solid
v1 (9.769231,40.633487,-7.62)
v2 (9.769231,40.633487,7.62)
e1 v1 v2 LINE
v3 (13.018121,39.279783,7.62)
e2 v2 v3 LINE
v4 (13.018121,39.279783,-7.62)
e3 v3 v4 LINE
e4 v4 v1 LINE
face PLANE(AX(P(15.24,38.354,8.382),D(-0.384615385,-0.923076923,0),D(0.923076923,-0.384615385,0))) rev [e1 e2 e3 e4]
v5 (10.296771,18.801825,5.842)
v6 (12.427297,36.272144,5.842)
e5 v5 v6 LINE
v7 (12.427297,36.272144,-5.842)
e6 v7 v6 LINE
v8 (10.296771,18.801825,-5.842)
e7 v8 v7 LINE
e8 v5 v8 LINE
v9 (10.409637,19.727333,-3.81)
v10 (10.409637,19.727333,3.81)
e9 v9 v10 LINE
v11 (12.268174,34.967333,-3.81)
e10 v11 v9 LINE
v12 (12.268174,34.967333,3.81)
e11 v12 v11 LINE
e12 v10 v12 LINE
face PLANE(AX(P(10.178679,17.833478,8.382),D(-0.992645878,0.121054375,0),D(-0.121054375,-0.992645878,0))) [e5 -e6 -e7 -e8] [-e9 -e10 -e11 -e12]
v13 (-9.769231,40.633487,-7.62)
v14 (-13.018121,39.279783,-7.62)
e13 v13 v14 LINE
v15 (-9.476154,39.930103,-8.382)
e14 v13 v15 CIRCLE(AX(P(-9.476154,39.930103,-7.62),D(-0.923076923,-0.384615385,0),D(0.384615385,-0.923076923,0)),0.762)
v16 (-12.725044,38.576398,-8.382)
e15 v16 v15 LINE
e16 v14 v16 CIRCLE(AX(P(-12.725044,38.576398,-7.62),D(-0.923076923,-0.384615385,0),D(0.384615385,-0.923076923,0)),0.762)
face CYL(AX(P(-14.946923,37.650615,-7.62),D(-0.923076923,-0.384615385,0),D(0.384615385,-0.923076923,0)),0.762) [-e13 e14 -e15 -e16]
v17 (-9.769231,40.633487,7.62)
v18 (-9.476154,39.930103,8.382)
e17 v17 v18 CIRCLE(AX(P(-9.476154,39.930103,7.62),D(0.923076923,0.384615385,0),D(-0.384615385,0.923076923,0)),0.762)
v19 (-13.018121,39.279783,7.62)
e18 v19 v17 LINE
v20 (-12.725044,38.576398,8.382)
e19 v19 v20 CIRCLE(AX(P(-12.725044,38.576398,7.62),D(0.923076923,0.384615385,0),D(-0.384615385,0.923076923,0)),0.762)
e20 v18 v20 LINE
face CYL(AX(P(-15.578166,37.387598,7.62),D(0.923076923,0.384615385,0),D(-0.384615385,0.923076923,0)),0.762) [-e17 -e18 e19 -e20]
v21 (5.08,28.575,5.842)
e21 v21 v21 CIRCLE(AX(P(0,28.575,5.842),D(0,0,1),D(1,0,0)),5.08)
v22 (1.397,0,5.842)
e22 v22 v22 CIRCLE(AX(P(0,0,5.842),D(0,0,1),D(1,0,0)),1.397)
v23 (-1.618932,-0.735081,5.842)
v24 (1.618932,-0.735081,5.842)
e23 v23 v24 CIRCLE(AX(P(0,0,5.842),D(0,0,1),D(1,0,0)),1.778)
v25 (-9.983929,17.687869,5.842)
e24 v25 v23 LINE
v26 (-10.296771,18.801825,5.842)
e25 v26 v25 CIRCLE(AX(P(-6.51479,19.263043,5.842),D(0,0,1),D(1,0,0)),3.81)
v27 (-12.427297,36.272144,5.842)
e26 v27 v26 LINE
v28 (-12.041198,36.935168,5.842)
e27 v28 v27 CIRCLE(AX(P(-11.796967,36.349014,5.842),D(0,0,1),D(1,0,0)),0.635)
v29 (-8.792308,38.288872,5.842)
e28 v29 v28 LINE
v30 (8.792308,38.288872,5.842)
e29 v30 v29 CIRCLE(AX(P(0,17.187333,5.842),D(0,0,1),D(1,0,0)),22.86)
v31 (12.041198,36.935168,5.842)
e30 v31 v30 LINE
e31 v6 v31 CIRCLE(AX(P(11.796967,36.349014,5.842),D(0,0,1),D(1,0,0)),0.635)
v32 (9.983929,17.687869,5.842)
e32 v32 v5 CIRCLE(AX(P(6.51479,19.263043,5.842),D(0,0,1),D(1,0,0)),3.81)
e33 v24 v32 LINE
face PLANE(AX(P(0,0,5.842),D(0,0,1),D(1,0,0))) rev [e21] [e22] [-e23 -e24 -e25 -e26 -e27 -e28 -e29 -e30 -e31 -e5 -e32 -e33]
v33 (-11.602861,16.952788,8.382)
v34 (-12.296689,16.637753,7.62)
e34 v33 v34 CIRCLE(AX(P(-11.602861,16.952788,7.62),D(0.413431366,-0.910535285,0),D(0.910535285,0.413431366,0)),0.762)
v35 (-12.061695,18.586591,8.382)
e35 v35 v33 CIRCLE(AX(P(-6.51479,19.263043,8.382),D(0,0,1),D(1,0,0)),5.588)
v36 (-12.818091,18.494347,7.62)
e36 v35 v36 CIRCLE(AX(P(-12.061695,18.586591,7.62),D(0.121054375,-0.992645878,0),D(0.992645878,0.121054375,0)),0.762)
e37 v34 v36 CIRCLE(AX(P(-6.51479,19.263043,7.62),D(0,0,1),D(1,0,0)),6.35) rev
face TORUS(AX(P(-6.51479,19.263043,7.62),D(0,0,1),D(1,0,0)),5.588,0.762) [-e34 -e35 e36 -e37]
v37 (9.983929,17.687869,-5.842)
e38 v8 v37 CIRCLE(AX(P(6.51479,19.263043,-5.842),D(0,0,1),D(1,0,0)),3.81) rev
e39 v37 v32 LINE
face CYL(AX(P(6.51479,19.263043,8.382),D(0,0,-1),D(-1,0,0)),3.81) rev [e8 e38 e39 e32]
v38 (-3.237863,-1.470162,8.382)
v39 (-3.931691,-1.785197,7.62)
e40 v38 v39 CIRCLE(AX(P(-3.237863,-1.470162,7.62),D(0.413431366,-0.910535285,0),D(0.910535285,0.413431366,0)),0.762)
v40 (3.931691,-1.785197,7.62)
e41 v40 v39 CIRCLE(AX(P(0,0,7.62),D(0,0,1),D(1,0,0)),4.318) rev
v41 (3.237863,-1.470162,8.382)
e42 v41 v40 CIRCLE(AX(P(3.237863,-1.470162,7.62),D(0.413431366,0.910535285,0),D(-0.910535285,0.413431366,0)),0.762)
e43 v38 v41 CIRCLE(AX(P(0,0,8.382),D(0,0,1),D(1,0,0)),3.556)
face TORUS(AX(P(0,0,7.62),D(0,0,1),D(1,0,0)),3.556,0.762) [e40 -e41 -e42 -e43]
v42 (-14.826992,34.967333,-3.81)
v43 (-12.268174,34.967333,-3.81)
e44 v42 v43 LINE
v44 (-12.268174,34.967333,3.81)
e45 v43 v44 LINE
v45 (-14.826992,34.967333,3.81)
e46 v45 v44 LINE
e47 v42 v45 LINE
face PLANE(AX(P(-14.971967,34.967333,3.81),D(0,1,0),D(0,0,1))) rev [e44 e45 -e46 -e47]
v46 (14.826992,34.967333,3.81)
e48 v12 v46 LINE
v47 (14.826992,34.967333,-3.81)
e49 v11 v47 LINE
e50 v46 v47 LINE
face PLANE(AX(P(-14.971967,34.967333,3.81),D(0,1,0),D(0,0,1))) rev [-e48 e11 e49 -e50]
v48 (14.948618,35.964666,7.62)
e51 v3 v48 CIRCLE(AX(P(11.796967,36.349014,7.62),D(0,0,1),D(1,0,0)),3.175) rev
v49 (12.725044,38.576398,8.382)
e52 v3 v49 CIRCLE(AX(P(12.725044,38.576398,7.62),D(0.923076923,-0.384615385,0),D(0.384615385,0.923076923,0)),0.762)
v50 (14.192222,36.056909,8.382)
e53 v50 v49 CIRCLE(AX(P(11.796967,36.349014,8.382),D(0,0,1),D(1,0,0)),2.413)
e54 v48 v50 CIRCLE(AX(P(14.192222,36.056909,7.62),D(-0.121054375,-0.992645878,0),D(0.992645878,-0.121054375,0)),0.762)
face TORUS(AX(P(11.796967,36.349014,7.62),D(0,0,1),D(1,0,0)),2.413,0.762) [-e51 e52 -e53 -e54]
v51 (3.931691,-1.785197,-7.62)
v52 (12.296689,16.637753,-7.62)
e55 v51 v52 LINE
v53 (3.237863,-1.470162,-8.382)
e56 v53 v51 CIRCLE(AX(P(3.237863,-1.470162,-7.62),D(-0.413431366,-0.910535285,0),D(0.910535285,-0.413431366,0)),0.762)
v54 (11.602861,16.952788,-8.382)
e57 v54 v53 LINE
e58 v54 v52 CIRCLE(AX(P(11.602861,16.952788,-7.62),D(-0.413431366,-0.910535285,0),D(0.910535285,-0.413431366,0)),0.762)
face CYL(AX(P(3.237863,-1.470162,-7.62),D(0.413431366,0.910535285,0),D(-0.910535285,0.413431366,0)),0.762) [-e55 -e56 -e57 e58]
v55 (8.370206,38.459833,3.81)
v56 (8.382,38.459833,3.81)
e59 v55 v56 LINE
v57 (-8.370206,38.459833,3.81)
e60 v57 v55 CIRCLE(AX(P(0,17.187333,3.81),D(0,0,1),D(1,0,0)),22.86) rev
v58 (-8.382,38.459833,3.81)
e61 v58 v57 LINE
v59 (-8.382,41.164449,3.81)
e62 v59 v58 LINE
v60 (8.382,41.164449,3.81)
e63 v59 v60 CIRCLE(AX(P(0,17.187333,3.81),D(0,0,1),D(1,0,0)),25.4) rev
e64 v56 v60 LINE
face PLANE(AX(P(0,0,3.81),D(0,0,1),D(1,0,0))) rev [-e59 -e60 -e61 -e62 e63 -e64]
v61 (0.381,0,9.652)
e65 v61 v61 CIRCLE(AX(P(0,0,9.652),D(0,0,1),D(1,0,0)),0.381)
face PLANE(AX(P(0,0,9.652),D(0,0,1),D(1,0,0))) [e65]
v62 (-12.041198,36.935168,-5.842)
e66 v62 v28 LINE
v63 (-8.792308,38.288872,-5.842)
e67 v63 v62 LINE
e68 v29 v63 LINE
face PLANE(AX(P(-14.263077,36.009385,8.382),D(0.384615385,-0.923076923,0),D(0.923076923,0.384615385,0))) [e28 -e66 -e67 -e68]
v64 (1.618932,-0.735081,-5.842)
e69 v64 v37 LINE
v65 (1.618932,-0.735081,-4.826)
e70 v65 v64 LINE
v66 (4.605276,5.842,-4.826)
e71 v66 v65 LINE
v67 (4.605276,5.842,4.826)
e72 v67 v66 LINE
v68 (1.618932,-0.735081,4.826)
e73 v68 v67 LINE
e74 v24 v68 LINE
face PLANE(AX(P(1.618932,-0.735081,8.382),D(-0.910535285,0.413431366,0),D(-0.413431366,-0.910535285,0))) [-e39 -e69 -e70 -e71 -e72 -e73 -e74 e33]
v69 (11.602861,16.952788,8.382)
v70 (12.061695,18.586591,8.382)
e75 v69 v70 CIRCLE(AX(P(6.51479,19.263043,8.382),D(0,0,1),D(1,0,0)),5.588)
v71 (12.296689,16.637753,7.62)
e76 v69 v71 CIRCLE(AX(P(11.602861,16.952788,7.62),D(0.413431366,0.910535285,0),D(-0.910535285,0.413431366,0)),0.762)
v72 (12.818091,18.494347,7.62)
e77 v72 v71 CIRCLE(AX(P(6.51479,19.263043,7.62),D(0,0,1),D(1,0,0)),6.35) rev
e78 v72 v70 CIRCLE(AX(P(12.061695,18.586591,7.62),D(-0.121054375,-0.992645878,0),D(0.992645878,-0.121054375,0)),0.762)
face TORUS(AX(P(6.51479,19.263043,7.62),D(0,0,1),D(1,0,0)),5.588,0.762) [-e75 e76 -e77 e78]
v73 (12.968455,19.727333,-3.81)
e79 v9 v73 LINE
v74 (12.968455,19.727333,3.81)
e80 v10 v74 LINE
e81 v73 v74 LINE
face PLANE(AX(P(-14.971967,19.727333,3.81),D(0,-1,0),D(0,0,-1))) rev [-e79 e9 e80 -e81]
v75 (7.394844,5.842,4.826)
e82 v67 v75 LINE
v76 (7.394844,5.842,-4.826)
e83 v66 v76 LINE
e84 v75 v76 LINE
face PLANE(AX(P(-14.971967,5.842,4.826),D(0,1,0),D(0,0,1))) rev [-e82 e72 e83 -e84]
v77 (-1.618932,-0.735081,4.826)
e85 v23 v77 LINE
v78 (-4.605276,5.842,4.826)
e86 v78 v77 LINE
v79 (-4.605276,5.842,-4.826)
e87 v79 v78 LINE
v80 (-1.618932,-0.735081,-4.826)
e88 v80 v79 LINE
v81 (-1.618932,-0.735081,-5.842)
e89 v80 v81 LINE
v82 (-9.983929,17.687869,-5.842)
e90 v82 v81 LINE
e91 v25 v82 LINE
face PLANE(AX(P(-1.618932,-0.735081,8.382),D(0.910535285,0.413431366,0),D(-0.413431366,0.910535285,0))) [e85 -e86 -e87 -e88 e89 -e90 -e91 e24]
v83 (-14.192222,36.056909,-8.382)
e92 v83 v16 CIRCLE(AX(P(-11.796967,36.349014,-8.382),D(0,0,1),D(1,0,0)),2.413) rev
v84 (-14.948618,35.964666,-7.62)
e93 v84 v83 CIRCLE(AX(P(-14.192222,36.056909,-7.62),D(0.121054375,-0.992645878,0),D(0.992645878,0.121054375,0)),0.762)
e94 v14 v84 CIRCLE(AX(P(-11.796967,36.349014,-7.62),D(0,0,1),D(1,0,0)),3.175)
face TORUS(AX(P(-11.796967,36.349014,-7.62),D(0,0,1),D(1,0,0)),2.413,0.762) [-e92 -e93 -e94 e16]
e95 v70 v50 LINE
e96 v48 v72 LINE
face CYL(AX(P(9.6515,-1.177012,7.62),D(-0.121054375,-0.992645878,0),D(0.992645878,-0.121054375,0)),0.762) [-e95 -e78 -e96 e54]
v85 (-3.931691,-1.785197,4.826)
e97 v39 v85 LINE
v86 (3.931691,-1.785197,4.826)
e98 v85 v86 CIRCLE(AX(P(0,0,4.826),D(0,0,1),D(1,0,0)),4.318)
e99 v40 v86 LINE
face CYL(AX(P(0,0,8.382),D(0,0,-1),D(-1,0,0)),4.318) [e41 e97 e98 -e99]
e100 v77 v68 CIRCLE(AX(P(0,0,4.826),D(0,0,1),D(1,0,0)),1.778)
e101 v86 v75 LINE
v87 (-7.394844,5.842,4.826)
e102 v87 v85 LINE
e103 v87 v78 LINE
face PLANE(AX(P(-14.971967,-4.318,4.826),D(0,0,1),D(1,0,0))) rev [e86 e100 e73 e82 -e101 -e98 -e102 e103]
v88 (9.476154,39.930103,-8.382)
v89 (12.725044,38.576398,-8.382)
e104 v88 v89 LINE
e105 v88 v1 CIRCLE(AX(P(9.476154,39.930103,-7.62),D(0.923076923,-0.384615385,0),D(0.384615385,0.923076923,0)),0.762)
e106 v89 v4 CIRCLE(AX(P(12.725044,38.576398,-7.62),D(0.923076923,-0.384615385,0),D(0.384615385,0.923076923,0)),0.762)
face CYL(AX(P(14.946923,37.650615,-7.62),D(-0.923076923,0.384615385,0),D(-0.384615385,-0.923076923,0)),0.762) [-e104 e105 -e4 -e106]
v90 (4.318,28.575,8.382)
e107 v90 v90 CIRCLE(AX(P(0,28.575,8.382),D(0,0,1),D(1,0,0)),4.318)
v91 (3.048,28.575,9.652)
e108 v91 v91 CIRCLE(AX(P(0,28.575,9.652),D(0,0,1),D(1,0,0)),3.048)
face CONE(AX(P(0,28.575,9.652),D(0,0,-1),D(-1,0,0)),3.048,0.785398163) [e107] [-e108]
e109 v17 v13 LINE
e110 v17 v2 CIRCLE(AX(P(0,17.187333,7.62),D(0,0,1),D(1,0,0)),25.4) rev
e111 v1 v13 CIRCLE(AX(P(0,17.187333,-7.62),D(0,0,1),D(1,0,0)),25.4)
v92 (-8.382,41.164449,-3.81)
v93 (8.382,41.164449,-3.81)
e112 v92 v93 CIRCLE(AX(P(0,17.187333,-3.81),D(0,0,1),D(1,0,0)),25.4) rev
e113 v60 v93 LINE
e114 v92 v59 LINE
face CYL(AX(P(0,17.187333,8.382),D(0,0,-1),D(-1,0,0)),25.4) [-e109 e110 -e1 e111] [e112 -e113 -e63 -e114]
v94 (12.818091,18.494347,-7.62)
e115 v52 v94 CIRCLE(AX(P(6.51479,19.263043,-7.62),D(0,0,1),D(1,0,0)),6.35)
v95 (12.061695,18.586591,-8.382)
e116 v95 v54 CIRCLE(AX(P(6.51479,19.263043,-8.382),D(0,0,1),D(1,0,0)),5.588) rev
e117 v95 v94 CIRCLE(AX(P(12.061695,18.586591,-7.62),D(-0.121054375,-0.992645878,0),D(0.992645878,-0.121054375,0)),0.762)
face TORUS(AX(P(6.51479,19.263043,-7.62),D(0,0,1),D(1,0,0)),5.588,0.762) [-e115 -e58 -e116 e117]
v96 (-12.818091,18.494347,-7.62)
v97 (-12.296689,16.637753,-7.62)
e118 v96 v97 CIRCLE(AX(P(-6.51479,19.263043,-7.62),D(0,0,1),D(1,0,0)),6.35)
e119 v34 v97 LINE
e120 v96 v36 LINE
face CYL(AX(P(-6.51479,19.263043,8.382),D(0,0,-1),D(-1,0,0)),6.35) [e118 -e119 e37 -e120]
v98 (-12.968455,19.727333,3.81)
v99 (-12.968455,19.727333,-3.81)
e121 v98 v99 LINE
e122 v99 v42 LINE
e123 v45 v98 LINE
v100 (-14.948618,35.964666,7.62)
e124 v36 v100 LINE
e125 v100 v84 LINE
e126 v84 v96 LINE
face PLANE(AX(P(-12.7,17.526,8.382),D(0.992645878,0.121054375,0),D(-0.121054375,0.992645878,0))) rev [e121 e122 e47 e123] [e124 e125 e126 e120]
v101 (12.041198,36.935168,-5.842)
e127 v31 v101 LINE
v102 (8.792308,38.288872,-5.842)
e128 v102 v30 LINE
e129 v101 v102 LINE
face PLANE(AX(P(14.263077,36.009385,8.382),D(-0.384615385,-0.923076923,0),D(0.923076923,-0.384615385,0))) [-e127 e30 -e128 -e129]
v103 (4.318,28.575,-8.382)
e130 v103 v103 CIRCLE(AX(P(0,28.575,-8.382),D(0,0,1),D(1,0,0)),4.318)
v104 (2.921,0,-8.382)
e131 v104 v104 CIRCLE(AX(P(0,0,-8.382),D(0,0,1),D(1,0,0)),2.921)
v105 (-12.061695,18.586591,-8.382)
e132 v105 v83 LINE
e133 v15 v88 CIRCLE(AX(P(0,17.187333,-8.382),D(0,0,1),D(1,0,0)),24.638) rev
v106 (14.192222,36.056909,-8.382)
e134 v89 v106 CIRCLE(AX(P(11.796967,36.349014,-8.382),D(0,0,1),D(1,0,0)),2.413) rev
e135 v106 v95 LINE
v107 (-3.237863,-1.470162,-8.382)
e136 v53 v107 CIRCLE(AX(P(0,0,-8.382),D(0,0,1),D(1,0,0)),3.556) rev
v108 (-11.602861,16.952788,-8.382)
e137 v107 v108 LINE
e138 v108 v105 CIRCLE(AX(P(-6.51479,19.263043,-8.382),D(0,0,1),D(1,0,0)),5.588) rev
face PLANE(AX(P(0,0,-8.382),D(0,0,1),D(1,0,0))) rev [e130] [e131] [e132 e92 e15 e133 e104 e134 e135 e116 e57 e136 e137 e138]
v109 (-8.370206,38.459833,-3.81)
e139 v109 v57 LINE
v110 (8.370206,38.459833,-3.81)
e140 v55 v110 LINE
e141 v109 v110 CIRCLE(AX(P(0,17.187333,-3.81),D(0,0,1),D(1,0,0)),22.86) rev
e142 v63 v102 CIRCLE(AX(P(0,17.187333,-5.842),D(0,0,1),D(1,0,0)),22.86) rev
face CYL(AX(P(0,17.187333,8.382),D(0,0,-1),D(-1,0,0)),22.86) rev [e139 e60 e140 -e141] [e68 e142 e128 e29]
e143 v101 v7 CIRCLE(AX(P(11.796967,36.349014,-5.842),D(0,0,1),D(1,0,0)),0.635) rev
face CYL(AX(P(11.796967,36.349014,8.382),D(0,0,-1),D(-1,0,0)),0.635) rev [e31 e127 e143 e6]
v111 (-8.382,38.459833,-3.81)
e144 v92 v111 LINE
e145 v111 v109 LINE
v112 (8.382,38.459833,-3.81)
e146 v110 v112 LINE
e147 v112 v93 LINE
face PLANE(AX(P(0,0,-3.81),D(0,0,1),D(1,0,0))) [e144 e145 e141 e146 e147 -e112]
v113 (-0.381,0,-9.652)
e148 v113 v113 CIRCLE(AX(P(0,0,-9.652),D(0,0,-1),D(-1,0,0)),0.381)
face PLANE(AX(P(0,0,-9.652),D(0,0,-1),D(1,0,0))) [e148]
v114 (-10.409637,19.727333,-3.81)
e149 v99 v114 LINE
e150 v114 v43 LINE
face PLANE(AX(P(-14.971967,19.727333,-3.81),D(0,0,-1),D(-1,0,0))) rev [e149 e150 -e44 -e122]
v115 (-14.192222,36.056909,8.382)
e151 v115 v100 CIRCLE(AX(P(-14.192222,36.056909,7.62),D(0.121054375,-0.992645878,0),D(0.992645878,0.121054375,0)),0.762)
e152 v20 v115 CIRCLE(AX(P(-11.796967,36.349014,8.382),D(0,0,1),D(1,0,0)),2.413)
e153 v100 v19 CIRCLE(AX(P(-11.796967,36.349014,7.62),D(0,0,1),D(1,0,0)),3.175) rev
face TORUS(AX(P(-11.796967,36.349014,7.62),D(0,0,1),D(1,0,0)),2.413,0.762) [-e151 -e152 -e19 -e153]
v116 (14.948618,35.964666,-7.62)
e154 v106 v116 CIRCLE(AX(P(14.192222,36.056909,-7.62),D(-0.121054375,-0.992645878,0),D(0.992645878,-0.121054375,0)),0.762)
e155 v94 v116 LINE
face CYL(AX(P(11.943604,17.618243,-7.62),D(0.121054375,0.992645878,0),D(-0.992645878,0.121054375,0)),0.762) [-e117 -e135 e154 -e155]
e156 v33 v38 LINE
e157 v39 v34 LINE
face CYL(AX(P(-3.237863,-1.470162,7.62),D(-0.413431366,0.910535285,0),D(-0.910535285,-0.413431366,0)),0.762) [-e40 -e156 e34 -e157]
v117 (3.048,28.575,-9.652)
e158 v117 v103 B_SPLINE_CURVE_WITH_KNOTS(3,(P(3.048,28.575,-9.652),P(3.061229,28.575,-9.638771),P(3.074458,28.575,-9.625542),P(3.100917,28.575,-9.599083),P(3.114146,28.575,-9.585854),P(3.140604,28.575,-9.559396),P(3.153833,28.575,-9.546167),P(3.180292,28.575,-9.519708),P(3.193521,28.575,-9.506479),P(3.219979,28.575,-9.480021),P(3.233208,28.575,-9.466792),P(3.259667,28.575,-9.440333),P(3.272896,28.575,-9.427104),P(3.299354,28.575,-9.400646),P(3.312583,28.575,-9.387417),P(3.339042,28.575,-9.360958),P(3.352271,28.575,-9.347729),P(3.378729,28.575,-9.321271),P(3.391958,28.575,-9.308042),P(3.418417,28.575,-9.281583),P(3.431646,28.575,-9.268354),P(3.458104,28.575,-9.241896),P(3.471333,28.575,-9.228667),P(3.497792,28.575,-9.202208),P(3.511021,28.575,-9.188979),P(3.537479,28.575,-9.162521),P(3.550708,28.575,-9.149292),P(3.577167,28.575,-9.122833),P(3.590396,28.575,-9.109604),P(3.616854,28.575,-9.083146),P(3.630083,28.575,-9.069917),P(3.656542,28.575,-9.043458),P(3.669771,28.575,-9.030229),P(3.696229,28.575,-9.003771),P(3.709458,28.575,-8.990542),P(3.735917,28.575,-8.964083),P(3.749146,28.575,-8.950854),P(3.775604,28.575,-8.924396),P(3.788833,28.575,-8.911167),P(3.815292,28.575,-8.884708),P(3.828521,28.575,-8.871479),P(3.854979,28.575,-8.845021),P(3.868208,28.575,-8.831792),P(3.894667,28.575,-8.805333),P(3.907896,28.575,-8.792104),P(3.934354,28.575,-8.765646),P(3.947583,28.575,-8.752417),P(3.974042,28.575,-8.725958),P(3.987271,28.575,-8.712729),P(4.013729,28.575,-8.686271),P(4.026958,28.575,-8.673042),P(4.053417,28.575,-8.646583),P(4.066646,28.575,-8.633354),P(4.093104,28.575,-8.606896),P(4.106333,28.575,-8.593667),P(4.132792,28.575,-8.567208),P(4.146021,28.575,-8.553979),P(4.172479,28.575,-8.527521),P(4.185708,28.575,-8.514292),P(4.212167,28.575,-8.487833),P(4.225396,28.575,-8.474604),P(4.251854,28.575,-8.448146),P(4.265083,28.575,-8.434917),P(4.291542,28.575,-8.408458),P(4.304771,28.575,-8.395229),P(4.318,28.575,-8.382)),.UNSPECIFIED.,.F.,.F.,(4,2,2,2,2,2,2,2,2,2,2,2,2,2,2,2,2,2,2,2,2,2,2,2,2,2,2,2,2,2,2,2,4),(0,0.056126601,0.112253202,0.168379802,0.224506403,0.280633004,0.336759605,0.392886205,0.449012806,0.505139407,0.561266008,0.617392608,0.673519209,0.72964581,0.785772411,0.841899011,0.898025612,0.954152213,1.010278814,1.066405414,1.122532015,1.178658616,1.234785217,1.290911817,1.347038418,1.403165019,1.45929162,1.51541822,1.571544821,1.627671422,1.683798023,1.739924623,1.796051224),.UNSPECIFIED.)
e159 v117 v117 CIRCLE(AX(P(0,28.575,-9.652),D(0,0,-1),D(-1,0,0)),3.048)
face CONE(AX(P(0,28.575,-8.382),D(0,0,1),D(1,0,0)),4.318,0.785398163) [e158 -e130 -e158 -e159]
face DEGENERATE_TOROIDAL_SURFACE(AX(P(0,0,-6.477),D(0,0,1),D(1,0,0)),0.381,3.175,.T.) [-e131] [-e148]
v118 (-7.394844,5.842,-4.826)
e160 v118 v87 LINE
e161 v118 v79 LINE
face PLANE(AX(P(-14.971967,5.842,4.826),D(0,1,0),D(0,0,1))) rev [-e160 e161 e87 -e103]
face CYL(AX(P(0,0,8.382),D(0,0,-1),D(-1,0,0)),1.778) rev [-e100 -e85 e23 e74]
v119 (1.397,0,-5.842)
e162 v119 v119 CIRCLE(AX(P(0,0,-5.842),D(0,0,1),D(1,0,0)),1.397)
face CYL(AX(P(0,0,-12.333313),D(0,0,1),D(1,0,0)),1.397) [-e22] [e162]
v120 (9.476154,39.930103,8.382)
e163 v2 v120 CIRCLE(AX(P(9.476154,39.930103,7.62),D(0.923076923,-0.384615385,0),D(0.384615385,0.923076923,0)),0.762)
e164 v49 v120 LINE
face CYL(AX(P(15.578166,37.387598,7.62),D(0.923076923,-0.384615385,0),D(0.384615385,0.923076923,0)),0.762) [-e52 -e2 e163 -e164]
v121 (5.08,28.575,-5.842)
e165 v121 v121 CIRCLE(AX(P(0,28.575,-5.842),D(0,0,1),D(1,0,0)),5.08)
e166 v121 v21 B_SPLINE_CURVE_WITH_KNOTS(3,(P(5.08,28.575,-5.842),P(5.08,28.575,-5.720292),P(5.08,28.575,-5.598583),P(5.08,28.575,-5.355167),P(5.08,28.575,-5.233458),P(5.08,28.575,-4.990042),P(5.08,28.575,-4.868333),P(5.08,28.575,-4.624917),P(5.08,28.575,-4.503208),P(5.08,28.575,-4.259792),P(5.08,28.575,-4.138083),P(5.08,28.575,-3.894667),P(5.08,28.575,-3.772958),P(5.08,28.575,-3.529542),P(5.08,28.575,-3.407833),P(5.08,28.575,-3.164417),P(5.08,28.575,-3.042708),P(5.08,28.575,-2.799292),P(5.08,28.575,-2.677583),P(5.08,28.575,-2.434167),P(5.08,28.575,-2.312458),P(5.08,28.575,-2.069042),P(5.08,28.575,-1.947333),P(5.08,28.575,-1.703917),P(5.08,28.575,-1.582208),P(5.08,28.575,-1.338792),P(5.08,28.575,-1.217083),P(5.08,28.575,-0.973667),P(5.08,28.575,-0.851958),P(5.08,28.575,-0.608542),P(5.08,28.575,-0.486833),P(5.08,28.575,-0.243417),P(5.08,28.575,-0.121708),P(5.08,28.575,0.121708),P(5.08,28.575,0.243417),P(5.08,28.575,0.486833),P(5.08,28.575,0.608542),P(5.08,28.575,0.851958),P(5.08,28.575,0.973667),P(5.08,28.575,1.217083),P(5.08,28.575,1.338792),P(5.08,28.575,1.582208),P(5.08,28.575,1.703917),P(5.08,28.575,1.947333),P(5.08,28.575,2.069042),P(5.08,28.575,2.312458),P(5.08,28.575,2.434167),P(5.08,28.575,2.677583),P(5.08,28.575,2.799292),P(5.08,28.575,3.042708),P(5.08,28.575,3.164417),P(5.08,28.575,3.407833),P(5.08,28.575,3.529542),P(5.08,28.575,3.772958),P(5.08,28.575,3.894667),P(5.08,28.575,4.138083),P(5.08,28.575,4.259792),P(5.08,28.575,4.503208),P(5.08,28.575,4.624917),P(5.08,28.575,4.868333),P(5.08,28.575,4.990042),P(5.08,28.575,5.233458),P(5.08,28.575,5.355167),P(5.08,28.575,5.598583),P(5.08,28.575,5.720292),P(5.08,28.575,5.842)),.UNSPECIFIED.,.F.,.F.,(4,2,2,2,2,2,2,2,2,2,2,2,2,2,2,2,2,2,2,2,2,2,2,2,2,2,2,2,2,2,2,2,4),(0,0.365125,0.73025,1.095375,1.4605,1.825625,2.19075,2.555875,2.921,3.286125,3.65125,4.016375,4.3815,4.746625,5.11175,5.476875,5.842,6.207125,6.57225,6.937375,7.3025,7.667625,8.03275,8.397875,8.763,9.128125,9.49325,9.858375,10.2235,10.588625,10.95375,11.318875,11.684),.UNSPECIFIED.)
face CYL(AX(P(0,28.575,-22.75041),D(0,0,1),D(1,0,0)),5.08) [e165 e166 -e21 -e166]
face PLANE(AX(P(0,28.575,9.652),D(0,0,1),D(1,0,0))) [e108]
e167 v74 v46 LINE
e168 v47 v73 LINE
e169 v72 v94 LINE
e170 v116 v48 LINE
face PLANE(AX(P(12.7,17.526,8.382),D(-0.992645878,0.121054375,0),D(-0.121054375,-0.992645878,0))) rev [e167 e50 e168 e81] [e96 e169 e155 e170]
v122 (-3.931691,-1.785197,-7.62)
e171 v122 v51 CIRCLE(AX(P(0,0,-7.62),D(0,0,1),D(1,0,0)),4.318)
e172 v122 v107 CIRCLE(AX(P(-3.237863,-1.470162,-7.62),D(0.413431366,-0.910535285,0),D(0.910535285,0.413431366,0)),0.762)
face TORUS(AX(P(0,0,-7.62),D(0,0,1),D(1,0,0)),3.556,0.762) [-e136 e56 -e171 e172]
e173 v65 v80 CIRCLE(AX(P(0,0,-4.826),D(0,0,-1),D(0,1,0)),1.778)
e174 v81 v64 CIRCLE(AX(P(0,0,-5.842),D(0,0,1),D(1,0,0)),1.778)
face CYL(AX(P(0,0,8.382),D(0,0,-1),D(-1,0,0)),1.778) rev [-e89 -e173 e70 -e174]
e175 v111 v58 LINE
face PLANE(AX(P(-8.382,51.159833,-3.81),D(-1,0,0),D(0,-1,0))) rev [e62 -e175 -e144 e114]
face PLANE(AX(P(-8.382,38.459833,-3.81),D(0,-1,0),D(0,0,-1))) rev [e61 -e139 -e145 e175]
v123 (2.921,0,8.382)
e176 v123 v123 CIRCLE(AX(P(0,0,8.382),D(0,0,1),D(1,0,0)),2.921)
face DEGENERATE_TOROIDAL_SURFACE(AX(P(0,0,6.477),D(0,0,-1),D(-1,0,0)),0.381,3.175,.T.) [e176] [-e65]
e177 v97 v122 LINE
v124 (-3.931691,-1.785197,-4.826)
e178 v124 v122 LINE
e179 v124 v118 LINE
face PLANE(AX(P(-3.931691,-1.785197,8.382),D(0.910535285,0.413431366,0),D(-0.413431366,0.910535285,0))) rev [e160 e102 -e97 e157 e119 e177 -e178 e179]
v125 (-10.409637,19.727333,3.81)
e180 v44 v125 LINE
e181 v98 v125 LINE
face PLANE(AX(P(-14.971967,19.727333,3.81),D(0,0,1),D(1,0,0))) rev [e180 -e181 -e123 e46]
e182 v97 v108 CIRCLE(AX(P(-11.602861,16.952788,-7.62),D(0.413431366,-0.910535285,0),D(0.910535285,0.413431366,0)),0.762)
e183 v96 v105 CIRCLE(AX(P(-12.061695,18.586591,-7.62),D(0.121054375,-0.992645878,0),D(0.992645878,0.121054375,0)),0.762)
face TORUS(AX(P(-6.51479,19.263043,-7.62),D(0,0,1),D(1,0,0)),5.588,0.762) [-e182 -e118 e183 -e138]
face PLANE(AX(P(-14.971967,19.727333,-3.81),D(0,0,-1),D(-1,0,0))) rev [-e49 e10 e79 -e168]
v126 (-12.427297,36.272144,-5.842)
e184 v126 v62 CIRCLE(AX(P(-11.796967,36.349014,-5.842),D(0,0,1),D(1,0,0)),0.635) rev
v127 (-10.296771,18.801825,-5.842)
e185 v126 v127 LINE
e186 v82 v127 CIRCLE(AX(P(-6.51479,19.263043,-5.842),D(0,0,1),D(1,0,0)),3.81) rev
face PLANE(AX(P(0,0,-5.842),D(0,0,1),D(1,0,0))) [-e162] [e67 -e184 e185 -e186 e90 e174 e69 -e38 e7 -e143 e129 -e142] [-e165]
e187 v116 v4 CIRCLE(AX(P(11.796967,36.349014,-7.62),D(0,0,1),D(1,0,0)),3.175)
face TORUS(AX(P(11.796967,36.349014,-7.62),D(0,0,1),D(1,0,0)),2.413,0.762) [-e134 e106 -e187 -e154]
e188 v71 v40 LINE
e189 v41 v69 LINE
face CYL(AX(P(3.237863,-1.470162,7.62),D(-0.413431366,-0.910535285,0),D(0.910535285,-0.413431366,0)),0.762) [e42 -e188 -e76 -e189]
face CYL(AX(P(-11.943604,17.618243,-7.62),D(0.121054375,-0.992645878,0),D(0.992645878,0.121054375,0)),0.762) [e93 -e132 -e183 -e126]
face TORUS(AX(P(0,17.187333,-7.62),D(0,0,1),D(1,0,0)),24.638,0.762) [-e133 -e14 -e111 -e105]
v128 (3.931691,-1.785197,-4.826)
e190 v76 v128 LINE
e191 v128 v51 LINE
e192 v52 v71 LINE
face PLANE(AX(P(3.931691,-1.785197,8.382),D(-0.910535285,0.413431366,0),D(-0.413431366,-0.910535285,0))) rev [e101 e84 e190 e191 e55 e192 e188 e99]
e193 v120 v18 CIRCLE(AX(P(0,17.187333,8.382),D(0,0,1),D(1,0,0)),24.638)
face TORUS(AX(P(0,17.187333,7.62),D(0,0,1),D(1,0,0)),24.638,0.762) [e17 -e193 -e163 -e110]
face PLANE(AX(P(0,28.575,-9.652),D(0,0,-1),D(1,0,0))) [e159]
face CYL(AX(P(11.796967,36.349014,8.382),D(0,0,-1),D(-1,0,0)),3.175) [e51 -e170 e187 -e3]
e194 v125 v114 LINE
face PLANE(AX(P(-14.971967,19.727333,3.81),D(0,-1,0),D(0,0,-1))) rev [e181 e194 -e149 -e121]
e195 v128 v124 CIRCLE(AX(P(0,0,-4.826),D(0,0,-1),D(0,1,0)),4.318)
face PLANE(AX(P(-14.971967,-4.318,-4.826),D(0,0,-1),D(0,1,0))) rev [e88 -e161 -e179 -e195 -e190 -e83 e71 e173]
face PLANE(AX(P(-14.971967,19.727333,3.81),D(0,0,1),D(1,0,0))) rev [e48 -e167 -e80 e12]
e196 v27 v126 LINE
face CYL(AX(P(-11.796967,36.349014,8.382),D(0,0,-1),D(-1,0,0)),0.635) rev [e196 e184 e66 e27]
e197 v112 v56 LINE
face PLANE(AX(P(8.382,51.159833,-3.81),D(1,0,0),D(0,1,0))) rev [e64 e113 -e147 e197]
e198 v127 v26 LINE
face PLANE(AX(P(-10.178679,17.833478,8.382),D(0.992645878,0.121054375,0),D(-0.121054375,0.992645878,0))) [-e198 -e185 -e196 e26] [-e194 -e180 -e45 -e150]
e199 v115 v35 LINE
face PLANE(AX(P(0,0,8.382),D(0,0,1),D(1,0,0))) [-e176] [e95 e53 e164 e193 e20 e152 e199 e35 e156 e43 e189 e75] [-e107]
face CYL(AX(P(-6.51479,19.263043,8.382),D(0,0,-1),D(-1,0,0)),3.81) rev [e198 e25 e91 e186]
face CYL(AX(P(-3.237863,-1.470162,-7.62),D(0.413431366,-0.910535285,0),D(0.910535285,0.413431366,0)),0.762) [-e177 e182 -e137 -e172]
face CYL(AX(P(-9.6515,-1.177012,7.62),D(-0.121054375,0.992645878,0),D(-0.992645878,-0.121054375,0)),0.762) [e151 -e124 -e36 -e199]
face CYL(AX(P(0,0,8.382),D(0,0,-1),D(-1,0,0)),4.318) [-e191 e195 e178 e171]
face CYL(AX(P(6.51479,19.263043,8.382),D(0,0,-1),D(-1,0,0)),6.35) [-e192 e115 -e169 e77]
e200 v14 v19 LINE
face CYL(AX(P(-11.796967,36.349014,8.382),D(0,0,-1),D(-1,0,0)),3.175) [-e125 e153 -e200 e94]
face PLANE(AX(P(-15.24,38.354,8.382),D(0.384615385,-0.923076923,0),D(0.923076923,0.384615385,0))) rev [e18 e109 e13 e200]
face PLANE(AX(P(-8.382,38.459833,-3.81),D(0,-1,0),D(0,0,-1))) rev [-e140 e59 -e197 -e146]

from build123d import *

# Parameters (mm, degrees)
BOSS_EXTRUDE1_DEPTH     = 8.382
FILLET1_R               = 25.4
FILLET2_R               = 3.175
FILLET3_R               = 6.35
SHELL1_T                = 2.54
CUT_EXTRUDE1_DEPTH      = 46.914035814
CUT_EXTRUDE1_DEPTH_BACK = 46.914035814
SKETCH2_W               = 9.652
SKETCH2_H               = 10.16
SKETCH3_R               = 1.397
BOSS_EXTRUDE2_DEPTH     = 16.764
SKETCH4_R               = 2.921
BOSS_EXTRUDE3_DEPTH     = 1.27
FILLET4_R               = 3.175
CUT_EXTRUDE2_DEPTH      = 47.162775769
CUT_EXTRUDE2_DEPTH_BACK = 47.162775769
SKETCH5_W               = 7.62
SKETCH5_H               = 15.24
SKETCH6_R               = 5.08
BOSS_EXTRUDE4_DEPTH     = 16.764
SKETCH7_R               = 4.318
BOSS_EXTRUDE5_DEPTH     = 1.27
CHAMFER1_SIZE           = 1.27
SKETCH9_W               = 16.764
SKETCH9_H               = 12.7
CUT_EXTRUDE3_DEPTH      = 3.81
FILLET5_R               = 0.762


# Some blends are built 0.0001 mm under size
with BuildPart() as part:
    # Sketch1 → Boss-Extrude1 (new, symmetric)
    with BuildSketch(Plane.XY):
        with BuildLine():
            Line((3.931691361, -1.785196639), (12.7, 17.526))
            Line((12.7, 17.526), (15.24, 38.354))
            Line((15.24, 38.354), (0, 44.704))
            Line((0, 44.704), (-15.24, 38.354))
            Line((-15.24, 38.354), (-12.7, 17.526))
            Line((-12.7, 17.526), (-3.931691361, -1.785196639))
            ThreePointArc((-3.931691361, -1.785196639), (0, -4.318), (3.931691361, -1.785196639))
        make_face()
    extrude(amount=BOSS_EXTRUDE1_DEPTH, both=True)

    # Fillet1
    fillet1_edges = [part.edges().sort_by_distance(p)[0] for p in [
        (0, 44.704, 0),
    ]]
    fillet(fillet1_edges, radius=FILLET1_R)

    # Fillet2
    fillet2_edges = [part.edges().sort_by_distance(p)[0] for p in [
        (-15.24, 38.354, 0),
        (15.24, 38.354, 0),
    ]]
    fillet(fillet2_edges, radius=FILLET2_R)

    # Fillet3
    fillet3_edges = [part.edges().sort_by_distance(p)[0] for p in [
        (-12.7, 17.526, 0),
        (12.7, 17.526, 0),
    ]]
    fillet(fillet3_edges, radius=FILLET3_R)

    # Shell1 (no face opened: a closed hollow body)
    add(offset(amount=-SHELL1_T, mode=Mode.PRIVATE), mode=Mode.SUBTRACT)

    # Sketch2 → Cut-Extrude1 (cut, two sides: drawn at the far end of the back side and taken through both)
    with BuildSketch(Plane(origin=(0, 0, 0), x_dir=(0, 0, -1), z_dir=(1, 0, 0)).offset(-CUT_EXTRUDE1_DEPTH_BACK)):
        with Locations((0, 0.762)):
            Rectangle(SKETCH2_W, SKETCH2_H)
    extrude(amount=CUT_EXTRUDE1_DEPTH + CUT_EXTRUDE1_DEPTH_BACK, mode=Mode.SUBTRACT)

    # Sketch3 → Boss-Extrude2 (add)
    with BuildSketch(Plane.XY.offset(8.382)):
        Circle(SKETCH3_R)
    extrude(amount=-BOSS_EXTRUDE2_DEPTH)

    # Sketch4 → Boss-Extrude3 (add)
    with BuildSketch(Plane.XY.offset(8.382)):
        Circle(SKETCH4_R)
    boss_extrude3 = extrude(amount=BOSS_EXTRUDE3_DEPTH)

    # Mirror1: Boss-Extrude3 across plane
    add(boss_extrude3.mirror(Plane.XY))

    # Fillet4
    # the kernel refuses this fillet: 3.175 mm, written as the material it takes off along each edge
    with BuildSketch(Plane(origin=(0, 0, 9.652), x_dir=(1, 0, 0), z_dir=(0, -1, 0))) as fillet4_piece_1:
        with BuildLine():
            CenterArc((0.381, -3.175), FILLET4_R, 36.869897646, 53.130102354)
            Line((0.381, 0), (0.381, 0.0635))
            Line((0.381, 0.0635), (2.921, 0.0635))
            Line((2.921, 0.0635), (2.9845, 0))
            ThreePointArc((2.9845, 0), (2.9845, -0.635), (2.9718, -1.2319))
            Line((2.9718, -1.2319), (2.921, -1.27))
        make_face()
    revolve(axis=Axis((0, 0, 9.652), (0, 0, 1)), mode=Mode.SUBTRACT)
    with BuildSketch(Plane(origin=(0, 0, -9.652), x_dir=(1, 0, 0), z_dir=(0, -1, 0))) as fillet4_piece_2:
        with BuildLine():
            CenterArc((0.381, 3.175), FILLET4_R, 270, 53.130102354)
            Line((0.381, 0), (0.381, -0.0635))
            Line((0.381, -0.0635), (2.921, -0.0635))
            Line((2.921, -0.0635), (2.9845, 0))
            ThreePointArc((2.9845, 0), (2.9845, 0.635), (2.9718, 1.2319))
            Line((2.9718, 1.2319), (2.921, 1.27))
        make_face()
    revolve(axis=Axis((0, 0, -9.652), (0, 0, 1)), mode=Mode.SUBTRACT)

    # Sketch5 → Cut-Extrude2 (cut, two sides: drawn at the far end of the back side and taken through both)
    with BuildSketch(Plane(origin=(0, 0, 0), x_dir=(0, 0, -1), z_dir=(1, 0, 0)).offset(-CUT_EXTRUDE2_DEPTH_BACK)):
        with Locations((0, 27.347333333)):
            Rectangle(SKETCH5_W, SKETCH5_H)
    extrude(amount=CUT_EXTRUDE2_DEPTH + CUT_EXTRUDE2_DEPTH_BACK, mode=Mode.SUBTRACT)

    # Sketch6 → Boss-Extrude4 (add)
    with BuildSketch(Plane.XY.offset(8.382)):
        with Locations((0, 28.575)):
            Circle(SKETCH6_R)
    extrude(amount=-BOSS_EXTRUDE4_DEPTH)

    # Sketch7 → Boss-Extrude5 (add)
    with BuildSketch(Plane.XY.offset(8.382)):
        with Locations((0, 28.575)):
            Circle(SKETCH7_R)
    boss_extrude5 = extrude(amount=BOSS_EXTRUDE5_DEPTH)

    # Mirror2: Boss-Extrude5 across plane
    add(boss_extrude5.mirror(Plane.XY))

    # Chamfer1
    chamfer1_edges = [part.edges().sort_by_distance(p)[0] for p in [
        (-4.318, 28.575, 9.652),
        (-4.318, 28.575, -9.652),
    ]]
    chamfer(chamfer1_edges, length=CHAMFER1_SIZE - 0.0001)  # a hair under: the kernel refuses the full size

    # Sketch9 → Cut-Extrude3 (cut, symmetric)
    with BuildSketch(Plane.XY):
        with Locations((0, 44.809833333)):
            Rectangle(SKETCH9_W, SKETCH9_H)
    extrude(amount=CUT_EXTRUDE3_DEPTH, both=True, mode=Mode.SUBTRACT)

    # Fillet5
    fillet5_edges = [part.edges().sort_by_distance(p)[0] for p in [
        (-11.393675882, 39.956635049, -8.382),
        (-11.393675882, 39.956635049, 8.382),
        (0, 42.587333333, -8.382),
        (0, 42.587333333, 8.382),
        (11.393675882, 39.956635049, -8.382),
        (11.393675882, 39.956635049, 8.382),
        (-13.88335447, 27.229506655, -8.382),
        (-14.540660788, 37.946752783, -8.382),
        (14.540660788, 37.946752783, -8.382),
        (-13.88335447, 27.229506655, 8.382),
        (-14.540660788, 37.946752783, 8.382),
        (14.540660788, 37.946752783, 8.382),
        (0, -4.318, 8.382),
        (13.88335447, 27.229506655, -8.382),
        (13.88335447, 27.229506655, 8.382),
        (-8.114190115, 7.426278367, -8.382),
        (-12.628279179, 17.546141938, -8.382),
        (12.628279179, 17.546141938, -8.382),
        (-8.114190115, 7.426278367, 8.382),
        (-12.628279179, 17.546141938, 8.382),
        (12.628279179, 17.546141938, 8.382),
        (8.114190115, 7.426278367, 8.382),
        (8.114190115, 7.426278367, -8.382),
        (0, -4.318, -8.382),
    ]]
    fillet(fillet5_edges, radius=FILLET5_R)


solid = part.part
